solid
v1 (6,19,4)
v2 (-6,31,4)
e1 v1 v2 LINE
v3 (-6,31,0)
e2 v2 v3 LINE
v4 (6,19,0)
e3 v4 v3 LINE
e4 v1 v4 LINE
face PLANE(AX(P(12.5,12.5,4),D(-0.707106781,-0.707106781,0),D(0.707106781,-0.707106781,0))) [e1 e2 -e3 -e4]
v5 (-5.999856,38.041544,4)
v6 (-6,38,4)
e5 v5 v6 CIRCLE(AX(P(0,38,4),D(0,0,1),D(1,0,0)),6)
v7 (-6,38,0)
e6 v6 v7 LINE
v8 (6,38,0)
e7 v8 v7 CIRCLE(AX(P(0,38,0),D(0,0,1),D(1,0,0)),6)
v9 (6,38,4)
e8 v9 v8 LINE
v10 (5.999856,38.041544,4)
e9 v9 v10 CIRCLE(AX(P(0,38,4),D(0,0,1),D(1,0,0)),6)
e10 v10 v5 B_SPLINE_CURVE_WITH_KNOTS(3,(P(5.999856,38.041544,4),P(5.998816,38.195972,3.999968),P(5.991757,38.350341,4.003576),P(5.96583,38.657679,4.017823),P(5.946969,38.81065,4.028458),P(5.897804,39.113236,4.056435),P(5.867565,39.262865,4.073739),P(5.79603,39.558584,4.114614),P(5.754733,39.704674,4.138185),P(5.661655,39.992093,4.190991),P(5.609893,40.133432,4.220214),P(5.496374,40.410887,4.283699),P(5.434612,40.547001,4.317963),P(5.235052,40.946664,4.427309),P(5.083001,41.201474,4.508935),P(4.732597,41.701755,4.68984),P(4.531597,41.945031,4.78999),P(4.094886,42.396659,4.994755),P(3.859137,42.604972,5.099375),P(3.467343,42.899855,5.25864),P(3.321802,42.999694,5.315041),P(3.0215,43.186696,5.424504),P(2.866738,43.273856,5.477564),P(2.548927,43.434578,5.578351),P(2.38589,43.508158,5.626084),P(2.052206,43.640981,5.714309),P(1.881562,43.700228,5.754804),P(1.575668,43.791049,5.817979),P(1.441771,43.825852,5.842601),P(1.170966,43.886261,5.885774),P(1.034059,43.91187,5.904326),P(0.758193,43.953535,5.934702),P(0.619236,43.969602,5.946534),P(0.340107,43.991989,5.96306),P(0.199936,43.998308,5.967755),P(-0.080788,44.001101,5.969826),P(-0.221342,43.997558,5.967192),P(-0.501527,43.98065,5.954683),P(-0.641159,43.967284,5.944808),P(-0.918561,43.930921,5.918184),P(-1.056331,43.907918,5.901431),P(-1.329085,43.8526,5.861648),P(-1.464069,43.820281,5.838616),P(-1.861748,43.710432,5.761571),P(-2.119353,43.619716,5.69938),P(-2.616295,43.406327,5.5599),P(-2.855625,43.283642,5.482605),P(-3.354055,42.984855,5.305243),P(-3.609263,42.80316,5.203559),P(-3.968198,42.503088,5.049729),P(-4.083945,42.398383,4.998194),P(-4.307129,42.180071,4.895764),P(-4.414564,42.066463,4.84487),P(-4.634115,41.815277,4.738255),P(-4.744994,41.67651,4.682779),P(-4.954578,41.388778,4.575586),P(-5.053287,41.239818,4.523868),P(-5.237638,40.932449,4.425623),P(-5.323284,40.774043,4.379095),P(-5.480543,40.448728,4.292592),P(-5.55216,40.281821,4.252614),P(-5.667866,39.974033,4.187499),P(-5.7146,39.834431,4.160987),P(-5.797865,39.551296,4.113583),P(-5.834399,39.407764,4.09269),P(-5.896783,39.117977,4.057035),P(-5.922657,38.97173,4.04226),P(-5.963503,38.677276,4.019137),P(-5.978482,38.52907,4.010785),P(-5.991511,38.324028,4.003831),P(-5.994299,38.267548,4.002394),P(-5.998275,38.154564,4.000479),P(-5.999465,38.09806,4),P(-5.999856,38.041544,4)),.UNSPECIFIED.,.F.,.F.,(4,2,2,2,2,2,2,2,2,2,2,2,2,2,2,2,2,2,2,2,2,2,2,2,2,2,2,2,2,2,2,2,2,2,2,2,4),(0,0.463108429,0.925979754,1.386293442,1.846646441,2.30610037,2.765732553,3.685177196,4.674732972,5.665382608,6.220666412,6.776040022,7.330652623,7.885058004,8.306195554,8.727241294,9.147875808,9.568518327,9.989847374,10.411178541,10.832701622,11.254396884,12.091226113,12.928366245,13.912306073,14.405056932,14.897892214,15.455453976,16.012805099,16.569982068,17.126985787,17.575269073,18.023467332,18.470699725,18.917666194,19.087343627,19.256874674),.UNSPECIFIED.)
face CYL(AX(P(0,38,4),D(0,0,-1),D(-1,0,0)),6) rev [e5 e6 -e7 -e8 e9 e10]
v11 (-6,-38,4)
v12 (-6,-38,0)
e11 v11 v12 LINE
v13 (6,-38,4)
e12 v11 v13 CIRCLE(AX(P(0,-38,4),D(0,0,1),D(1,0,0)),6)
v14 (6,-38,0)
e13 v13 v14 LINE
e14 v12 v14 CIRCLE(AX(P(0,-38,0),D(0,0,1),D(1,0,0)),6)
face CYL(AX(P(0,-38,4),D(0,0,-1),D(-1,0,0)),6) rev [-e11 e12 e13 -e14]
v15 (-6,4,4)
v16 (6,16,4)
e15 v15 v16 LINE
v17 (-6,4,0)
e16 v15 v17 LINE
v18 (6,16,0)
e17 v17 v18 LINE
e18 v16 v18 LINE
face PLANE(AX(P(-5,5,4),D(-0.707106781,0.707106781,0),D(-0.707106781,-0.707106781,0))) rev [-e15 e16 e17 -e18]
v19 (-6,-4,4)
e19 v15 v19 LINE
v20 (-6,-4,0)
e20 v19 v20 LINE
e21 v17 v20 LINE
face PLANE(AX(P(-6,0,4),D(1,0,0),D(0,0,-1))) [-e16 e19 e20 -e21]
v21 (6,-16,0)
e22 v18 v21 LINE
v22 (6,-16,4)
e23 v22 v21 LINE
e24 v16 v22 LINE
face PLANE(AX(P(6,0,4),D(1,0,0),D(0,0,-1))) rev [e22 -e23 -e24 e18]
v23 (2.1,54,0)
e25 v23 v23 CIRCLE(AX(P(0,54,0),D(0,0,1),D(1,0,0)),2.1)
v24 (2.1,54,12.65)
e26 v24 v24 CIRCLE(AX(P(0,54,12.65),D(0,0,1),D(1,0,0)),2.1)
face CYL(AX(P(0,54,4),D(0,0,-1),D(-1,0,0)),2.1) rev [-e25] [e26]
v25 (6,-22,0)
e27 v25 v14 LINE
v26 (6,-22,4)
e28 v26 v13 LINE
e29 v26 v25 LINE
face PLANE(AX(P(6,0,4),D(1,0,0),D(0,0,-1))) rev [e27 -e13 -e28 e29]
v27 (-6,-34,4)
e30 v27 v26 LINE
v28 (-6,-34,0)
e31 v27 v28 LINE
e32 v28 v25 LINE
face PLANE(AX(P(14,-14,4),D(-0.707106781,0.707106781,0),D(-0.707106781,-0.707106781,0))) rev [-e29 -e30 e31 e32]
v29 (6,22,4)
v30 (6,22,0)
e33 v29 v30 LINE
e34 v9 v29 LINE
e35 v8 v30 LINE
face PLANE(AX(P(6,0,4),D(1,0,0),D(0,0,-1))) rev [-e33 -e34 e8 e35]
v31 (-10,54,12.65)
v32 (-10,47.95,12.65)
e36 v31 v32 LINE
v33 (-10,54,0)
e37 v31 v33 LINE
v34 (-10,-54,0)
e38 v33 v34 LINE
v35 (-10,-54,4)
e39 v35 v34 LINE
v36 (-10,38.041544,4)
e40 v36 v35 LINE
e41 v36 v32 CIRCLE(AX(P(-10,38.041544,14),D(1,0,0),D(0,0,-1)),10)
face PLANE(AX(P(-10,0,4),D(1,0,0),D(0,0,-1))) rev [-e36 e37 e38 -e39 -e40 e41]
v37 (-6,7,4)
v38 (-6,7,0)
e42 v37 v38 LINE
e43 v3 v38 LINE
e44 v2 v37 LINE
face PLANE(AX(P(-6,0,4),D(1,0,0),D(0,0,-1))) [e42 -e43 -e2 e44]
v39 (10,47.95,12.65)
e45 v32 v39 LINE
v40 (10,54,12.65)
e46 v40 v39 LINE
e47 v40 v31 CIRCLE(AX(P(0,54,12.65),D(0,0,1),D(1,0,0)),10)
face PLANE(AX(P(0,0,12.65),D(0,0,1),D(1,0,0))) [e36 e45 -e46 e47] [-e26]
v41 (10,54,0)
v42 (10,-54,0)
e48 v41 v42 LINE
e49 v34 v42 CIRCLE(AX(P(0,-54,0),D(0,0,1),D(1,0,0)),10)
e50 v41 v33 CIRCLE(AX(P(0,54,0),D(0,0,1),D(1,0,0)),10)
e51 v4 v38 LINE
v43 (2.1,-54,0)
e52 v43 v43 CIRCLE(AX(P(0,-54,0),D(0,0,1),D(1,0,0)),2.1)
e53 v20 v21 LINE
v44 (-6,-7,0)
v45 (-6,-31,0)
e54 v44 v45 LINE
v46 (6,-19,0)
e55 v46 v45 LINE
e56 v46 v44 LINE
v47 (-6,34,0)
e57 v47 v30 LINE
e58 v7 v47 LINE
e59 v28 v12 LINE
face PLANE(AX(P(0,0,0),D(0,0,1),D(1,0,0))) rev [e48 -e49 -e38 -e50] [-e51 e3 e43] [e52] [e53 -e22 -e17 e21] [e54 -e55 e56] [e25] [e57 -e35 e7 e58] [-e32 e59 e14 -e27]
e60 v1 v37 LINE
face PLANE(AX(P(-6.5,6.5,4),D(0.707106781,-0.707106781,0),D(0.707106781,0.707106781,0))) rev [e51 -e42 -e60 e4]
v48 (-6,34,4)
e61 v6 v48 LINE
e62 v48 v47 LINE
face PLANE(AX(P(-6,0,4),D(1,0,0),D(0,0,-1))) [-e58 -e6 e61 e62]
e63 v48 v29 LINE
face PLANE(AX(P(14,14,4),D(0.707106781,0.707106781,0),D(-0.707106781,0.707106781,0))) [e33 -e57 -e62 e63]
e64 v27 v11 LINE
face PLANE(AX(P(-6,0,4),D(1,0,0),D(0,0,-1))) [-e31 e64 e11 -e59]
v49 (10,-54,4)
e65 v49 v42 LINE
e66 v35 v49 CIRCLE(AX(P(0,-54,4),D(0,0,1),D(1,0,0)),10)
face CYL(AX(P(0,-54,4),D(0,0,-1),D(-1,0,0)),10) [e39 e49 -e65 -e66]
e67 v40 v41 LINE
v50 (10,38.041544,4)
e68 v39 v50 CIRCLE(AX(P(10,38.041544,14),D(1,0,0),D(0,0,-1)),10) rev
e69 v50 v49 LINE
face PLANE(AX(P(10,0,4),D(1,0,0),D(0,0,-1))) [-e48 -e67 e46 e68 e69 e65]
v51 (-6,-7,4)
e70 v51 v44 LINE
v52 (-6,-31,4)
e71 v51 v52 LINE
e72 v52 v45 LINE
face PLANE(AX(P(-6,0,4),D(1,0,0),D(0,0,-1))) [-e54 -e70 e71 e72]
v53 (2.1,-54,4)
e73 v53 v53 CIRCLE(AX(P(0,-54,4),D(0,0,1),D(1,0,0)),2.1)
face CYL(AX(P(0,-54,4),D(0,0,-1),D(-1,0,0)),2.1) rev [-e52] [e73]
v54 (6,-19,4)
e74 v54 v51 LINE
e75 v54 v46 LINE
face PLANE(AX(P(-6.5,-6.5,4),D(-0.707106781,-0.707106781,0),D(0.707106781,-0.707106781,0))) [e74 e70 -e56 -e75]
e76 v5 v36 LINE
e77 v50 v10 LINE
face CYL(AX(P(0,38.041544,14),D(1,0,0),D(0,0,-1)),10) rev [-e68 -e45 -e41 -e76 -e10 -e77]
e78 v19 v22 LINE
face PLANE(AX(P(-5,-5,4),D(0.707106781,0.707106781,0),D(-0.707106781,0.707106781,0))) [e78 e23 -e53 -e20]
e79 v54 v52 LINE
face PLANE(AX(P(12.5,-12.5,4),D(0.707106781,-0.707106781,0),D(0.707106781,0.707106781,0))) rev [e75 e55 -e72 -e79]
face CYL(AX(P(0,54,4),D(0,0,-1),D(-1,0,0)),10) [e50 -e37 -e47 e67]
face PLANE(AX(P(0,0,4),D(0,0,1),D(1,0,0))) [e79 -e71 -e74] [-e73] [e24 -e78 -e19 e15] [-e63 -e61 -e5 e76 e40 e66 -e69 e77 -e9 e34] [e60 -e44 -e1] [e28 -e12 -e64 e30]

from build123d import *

# Parameters (mm, degrees)
CROQUIS1_R              = 2.1
SALIENTE_EXTRUIR1_DEPTH = 4
CROQUIS1_6_R            = 2.1
SALIENTE_EXTRUIR3_DEPTH = 12.65
REDONDEO1_R             = 10


with BuildPart() as part:
    # Croquis1 → Saliente-Extruir1 (new body)
    with BuildSketch(Plane.XY):
        with BuildLine():
            ThreePointArc((10, 54), (0, 64), (-10, 54))
            Line((-10, 54), (-10, -54))
            ThreePointArc((-10, -54), (0, -64), (10, -54))
            Line((10, -54), (10, 54))
        make_face()
        with Locations((0, 54)):
            Circle(CROQUIS1_R, mode=Mode.SUBTRACT)
        with BuildLine():
            Line((6, 38), (6, 22))
            Line((6, 22), (-6, 34))
            Line((-6, 34), (-6, 38))
            ThreePointArc((-6, 38), (0, 44), (6, 38))
        make_face(mode=Mode.SUBTRACT)
        Polygon((6, 16), (6, -16), (-6, -4), (-6, 4), align=None, mode=Mode.SUBTRACT)
        with BuildLine():
            Line((6, -22), (6, -38))
            ThreePointArc((6, -38), (0, -44), (-6, -38))
            Line((-6, -38), (-6, -34))
            Line((-6, -34), (6, -22))
        make_face(mode=Mode.SUBTRACT)
        Polygon((-6, -31), (-6, -7), (6, -19), align=None, mode=Mode.SUBTRACT)
        Polygon((-6, 7), (-6, 31), (6, 19), align=None, mode=Mode.SUBTRACT)
        with Locations((0, -54)):
            Circle(CROQUIS1_R, mode=Mode.SUBTRACT)
    extrude(amount=SALIENTE_EXTRUIR1_DEPTH)

    # Croquis1<6> → Saliente-Extruir3 (add)
    with BuildSketch(Plane.XY):
        with BuildLine():
            Line((10, 47.95), (10, 54))
            ThreePointArc((10, 54), (0, 64), (-10, 54))
            Line((-10, 54), (-10, 47.95))
            Line((-10, 47.95), (10, 47.95))
        make_face()
        with Locations((0, 54)):
            Circle(CROQUIS1_6_R, mode=Mode.SUBTRACT)
    extrude(amount=SALIENTE_EXTRUIR3_DEPTH)

    # Redondeo1
    # the kernel refuses this fillet: 10 mm, written as the material it adds along each edge
    with BuildSketch(Plane(origin=(10, 47.95, 4), x_dir=(0, 0, 1), z_dir=(-1, 0, 0))) as redondeo1_piece_1_section:
        with BuildLine():
            CenterArc((10, -9.908455985), REDONDEO1_R, 97.758619889, 82.241380111)
            Line((0, -9.908455985), (-0.2, -9.908455985))
            Line((-0.2, -9.908455985), (-0.2, 0))
            Line((-0.2, 0), (0, 0.2))
            ThreePointArc((0, 0.2), (4.325, 0.2), (8.623, 0.19816912))
            Line((8.623, 0.19816912), (8.65, 0))
        make_face()
    redondeo1_piece_1 = extrude(amount=20, mode=Mode.PRIVATE)
    redondeo1_piece_1 = redondeo1_piece_1 - Plane(origin=(0, 38, 6.259394391), x_dir=(-1, 0, 0), z_dir=(0, 0, -1)) * Cylinder(6, 80, mode=Mode.PRIVATE)
    add(redondeo1_piece_1)


solid = part.part
